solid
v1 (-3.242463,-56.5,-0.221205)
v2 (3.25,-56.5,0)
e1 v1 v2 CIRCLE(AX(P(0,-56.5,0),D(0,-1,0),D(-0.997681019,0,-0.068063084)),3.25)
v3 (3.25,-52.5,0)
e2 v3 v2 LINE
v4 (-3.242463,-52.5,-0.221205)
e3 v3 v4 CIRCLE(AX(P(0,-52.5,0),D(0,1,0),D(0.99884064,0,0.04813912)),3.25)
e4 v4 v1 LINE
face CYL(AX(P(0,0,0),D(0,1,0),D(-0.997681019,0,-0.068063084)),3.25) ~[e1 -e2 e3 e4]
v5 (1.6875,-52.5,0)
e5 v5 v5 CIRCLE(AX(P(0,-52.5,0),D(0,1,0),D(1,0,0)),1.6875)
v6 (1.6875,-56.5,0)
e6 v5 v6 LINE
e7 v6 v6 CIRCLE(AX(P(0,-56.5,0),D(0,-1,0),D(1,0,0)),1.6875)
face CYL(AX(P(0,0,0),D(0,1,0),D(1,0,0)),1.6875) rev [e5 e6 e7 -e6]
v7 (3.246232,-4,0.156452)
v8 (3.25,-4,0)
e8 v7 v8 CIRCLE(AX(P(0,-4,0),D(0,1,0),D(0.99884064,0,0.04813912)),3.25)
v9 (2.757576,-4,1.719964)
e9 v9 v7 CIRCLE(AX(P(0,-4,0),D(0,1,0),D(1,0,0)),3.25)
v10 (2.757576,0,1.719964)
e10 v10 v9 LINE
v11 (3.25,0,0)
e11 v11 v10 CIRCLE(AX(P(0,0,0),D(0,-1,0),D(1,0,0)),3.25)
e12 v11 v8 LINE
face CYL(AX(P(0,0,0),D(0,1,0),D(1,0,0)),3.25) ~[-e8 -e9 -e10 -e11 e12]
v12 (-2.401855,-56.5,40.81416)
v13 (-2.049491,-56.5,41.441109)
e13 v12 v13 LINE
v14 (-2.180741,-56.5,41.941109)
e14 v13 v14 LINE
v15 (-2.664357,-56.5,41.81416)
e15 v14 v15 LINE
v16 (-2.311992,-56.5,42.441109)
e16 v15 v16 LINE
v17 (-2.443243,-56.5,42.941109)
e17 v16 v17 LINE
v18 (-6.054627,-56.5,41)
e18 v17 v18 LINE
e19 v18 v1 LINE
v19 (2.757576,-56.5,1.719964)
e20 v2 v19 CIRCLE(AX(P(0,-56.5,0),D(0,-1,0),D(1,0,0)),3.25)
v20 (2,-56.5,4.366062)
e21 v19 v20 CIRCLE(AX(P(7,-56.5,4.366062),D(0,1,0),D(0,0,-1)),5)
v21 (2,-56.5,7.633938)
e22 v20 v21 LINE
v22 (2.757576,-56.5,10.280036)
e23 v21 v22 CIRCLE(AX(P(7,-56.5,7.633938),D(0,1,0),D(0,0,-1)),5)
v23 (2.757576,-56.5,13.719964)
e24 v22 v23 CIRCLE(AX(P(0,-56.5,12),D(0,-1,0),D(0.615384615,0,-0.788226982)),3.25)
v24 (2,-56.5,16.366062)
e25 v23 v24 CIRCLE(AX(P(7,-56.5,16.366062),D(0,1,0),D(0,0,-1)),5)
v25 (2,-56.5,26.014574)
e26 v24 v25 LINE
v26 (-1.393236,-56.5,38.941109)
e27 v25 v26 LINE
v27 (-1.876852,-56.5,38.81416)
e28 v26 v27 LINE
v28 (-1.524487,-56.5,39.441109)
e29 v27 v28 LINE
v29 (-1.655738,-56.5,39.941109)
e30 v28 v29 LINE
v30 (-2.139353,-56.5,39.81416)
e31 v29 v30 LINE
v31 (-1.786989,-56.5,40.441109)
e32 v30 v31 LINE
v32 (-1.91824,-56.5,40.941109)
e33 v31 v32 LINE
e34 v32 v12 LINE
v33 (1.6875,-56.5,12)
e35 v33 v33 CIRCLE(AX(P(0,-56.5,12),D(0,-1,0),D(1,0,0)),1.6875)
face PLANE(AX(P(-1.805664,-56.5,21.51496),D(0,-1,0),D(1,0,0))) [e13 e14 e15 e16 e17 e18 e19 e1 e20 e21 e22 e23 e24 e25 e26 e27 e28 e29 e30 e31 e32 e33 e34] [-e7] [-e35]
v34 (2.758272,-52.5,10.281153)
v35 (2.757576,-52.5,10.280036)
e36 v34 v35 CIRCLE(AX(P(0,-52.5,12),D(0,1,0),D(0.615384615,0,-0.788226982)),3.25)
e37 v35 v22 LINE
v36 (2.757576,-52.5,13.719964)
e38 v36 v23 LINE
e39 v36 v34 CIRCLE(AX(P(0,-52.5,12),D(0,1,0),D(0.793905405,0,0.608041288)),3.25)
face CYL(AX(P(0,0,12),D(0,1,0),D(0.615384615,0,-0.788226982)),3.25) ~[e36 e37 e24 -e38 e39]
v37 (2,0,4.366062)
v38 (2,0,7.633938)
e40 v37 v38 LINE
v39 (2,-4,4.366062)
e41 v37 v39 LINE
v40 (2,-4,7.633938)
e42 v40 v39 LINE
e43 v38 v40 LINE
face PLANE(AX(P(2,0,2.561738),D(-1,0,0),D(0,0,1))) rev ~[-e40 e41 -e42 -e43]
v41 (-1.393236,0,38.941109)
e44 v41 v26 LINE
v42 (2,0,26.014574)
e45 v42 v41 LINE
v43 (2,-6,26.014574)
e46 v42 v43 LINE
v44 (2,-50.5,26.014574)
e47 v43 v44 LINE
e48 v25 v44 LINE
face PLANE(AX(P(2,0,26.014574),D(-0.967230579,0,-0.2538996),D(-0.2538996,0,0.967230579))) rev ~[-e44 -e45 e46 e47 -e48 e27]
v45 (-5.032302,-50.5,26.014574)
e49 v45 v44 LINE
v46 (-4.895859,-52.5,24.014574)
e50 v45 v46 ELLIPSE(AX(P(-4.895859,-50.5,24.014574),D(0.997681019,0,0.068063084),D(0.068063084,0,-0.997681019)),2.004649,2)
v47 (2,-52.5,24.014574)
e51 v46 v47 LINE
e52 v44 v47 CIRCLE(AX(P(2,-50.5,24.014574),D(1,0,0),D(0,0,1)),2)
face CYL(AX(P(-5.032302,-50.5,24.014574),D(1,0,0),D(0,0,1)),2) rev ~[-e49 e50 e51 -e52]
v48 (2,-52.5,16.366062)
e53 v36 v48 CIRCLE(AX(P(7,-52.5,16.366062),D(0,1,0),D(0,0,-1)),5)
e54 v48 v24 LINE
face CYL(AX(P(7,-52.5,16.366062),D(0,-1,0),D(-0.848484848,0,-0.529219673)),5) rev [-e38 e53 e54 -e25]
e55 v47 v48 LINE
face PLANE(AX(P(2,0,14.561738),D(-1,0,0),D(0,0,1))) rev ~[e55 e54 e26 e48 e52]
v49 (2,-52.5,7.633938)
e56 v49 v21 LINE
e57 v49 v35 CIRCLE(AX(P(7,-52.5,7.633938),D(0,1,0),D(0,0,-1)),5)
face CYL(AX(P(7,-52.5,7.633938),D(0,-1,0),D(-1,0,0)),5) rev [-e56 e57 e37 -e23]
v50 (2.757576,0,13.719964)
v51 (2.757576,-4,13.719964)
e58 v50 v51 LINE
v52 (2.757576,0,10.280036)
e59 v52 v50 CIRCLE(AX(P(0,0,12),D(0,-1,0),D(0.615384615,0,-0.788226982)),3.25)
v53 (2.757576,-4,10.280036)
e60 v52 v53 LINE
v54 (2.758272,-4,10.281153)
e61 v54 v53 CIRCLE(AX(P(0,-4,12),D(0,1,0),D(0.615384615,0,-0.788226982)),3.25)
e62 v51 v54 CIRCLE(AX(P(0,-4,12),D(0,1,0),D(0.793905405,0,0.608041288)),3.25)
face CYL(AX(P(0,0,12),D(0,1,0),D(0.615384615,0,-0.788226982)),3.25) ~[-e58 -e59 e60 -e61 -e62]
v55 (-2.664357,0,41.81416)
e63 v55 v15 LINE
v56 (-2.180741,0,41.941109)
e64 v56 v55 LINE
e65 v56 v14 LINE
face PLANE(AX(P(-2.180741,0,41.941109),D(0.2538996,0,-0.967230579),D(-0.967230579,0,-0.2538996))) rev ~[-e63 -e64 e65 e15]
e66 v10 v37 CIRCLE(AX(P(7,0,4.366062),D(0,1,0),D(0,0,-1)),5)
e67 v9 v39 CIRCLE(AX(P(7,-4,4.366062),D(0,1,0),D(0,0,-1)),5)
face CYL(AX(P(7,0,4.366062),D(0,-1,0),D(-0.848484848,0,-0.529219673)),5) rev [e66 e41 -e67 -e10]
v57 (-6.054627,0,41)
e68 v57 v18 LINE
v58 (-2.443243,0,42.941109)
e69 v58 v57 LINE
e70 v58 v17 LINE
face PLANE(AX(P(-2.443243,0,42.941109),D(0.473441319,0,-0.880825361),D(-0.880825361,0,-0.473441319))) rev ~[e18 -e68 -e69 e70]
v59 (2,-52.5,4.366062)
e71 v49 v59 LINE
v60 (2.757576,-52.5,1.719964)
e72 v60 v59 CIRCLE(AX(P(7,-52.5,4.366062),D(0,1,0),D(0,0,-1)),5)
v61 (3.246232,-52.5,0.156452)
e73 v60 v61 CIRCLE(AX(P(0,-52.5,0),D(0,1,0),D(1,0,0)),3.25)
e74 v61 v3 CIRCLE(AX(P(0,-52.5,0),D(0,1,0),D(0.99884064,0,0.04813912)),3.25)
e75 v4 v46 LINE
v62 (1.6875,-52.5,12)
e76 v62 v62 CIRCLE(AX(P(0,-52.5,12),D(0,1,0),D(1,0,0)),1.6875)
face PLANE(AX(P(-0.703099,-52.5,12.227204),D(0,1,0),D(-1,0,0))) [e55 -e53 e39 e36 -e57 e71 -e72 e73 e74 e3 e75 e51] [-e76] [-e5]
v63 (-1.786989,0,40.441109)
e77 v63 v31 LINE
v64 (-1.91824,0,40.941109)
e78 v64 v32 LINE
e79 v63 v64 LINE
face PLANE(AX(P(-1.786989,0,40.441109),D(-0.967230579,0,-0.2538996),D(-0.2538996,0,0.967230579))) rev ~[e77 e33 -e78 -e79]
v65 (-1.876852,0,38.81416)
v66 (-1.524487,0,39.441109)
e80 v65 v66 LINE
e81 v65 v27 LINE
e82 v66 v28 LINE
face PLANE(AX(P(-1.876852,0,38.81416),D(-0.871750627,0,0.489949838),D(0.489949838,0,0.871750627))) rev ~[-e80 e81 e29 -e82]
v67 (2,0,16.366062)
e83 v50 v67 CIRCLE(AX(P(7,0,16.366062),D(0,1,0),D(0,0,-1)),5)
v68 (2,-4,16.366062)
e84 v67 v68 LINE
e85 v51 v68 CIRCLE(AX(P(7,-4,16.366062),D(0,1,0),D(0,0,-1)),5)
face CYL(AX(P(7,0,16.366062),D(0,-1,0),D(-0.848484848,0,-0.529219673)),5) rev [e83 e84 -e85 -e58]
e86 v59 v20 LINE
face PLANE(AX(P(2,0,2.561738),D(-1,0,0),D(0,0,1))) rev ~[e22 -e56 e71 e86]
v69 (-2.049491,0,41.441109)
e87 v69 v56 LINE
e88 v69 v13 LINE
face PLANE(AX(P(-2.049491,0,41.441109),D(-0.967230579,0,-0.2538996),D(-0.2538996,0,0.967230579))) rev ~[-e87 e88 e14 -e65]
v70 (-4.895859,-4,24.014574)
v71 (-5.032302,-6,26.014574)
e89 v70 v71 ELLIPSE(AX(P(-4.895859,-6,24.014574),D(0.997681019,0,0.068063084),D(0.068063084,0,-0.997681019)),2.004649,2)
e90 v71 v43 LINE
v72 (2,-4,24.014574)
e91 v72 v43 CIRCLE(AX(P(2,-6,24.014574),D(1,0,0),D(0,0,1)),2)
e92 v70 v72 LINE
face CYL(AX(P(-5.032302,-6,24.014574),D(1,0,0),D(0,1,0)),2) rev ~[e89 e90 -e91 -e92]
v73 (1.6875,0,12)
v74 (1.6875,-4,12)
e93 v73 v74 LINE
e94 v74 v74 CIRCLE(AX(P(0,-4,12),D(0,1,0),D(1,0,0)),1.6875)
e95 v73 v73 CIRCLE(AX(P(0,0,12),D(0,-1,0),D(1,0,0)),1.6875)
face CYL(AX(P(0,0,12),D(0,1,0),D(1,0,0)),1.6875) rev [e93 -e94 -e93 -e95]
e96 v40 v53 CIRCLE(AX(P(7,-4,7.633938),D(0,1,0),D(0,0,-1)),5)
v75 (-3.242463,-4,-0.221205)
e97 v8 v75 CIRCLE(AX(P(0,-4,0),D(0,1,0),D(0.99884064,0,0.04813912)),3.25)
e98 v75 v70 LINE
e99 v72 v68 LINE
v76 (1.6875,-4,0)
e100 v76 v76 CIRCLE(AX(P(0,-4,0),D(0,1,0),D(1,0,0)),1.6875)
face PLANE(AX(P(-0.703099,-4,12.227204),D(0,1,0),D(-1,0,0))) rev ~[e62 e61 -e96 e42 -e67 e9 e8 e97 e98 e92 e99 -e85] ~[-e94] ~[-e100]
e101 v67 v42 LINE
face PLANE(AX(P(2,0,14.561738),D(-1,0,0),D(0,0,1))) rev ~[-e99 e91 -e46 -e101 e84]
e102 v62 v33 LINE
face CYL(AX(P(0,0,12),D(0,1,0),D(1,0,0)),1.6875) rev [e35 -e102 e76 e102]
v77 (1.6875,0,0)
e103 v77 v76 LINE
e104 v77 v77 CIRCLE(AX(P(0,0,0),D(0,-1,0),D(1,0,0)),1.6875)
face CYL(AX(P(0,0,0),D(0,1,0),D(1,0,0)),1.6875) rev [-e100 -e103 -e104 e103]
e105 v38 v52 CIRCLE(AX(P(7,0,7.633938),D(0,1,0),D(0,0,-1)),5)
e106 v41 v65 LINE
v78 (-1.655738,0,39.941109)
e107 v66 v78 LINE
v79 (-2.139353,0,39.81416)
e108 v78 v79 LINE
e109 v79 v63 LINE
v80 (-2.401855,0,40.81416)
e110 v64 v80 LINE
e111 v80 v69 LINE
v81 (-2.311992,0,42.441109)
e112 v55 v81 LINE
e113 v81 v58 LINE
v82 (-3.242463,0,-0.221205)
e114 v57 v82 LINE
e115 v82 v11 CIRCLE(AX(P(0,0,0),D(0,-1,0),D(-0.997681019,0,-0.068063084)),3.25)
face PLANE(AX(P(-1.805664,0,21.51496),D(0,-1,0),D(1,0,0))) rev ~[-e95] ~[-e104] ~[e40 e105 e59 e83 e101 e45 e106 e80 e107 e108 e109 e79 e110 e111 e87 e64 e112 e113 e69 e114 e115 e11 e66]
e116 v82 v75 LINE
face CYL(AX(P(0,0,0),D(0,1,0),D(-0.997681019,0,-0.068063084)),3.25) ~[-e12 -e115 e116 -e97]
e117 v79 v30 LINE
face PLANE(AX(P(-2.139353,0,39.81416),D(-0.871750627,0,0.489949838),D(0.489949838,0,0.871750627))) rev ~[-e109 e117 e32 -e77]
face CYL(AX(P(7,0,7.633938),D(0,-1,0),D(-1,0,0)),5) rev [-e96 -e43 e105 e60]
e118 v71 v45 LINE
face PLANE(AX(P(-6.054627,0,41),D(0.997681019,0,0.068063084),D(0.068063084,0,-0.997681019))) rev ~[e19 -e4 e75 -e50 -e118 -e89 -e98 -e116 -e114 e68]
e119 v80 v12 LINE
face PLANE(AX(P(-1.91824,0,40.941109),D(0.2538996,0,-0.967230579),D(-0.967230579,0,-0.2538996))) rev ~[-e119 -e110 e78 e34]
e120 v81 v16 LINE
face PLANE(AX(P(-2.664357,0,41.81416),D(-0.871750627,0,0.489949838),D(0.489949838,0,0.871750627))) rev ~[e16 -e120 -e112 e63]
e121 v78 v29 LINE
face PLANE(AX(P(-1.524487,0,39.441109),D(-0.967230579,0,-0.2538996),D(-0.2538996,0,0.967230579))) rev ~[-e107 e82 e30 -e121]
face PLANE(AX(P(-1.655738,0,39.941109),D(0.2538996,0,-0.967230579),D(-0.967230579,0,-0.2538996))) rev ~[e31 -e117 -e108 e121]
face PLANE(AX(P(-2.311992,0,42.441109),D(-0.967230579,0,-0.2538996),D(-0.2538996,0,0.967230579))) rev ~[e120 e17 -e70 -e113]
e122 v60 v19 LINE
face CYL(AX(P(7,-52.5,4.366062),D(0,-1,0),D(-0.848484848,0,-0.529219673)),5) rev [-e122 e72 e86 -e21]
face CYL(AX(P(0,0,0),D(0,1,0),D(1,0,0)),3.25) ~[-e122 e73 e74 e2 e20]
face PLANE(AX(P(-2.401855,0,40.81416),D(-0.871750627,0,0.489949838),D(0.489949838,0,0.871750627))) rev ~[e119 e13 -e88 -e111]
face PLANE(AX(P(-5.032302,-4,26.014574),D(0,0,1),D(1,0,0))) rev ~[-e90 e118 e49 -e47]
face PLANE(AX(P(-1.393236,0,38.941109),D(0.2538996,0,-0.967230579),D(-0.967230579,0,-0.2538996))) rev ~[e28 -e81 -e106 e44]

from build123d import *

# Parameters (mm, degrees)
F0_R     = 1.6875
F0_R_2   = 2
F1_DEPTH = 56.5
F3_START = -4
F3_DEPTH = 48.5
F5_R     = 5
F6_R     = 2


# Not quite as in the source:
# - a feature of the source that left no trace in its solid (it failed there, or was rolled back) is left out
# - a feature names something its author has since deleted; it is built from what else it names


with BuildPart() as f1:
    # F0 (on Front) → F1 (new body)
    with BuildSketch(Plane.XZ):
        with BuildLine():
            ThreePointArc((-3.2424633134, -0.2212050215), (-1.5238508153, 2.8706059801), (2, 2.5617376915))
            Line((2, 2.5617376915), (2, 9.4382623085))
            ThreePointArc((2, 9.4382623085), (3.25, 12), (2, 14.5617376915))
            Line((2, 14.5617376915), (2, 16))
            Line((2, 16), (2, 26.0145742767))
            Line((2, 26.0145742767), (-1.3932364987, 38.9411094094))
            Line((-1.3932364987, 38.9411094094), (-1.8768517883, 38.8141596092))
            Line((-1.8768517883, 38.8141596092), (-1.5244873121, 39.4411094094))
            Line((-1.5244873121, 39.4411094094), (-1.6557381254, 39.9411094094))
            Line((-1.6557381254, 39.9411094094), (-2.1393534149, 39.8141596092))
            Line((-2.1393534149, 39.8141596092), (-1.7869889387, 40.4411094094))
            Line((-1.7869889387, 40.4411094094), (-1.918239752, 40.9411094094))
            Line((-1.918239752, 40.9411094094), (-2.4018550415, 40.8141596092))
            Line((-2.4018550415, 40.8141596092), (-2.0494905653, 41.4411094094))
            Line((-2.0494905653, 41.4411094094), (-2.1807413786, 41.9411094094))
            Line((-2.1807413786, 41.9411094094), (-2.6643566681, 41.8141596092))
            Line((-2.6643566681, 41.8141596092), (-2.3119921919, 42.4411094094))
            Line((-2.3119921919, 42.4411094094), (-2.4432430052, 42.9411094094))
            Line((-2.4432430052, 42.9411094094), (-6.0546269865, 41))
            Line((-6.0546269865, 41), (-3.2424633134, -0.2212050215))
        make_face()
        with Locations((0, 12)):
            Circle(F0_R, mode=Mode.SUBTRACT)
        with BuildLine():
            ThreePointArc((3.25, 0), (2.9208303614, 1.4252192814), (2, 2.5617376915))
            ThreePointArc((2, 2.5617376915), (-1.5238508153, 2.8706059801), (-3.2424633134, -0.2212050215))
            ThreePointArc((-3.2424633134, -0.2212050215), (0.1106666878, -3.2481152819), (3.25, 0))
        make_face()
        Circle(F0_R_2, mode=Mode.SUBTRACT)
        Circle(F0_R_2)
        Circle(F0_R, mode=Mode.SUBTRACT)
    extrude(amount=F1_DEPTH)

    # F2 (on face) → F3 (cut)
    with BuildSketch(Plane(origin=(0, 0, 0), x_dir=(-1, 0, 0), z_dir=(0, 1, 0)).offset(F3_START)):
        with BuildLine():
            Line((5.032301952, 26.0145742767), (-2, 26.0145742767))
            Line((-2, 26.0145742767), (-2.5801925668, 13.9761341853))
            ThreePointArc((-2.5801925668, 13.9761341853), (-3.2462320816, 12.1564521408), (-2.7582721639, 10.2811530987))
            Line((-2.7582721639, 10.2811530987), (-3.2462320816, 0.1564521408))
            ThreePointArc((-3.2462320816, 0.1564521408), (-0.1888379833, -3.2445092412), (3.2424633134, -0.2212050215))
            Line((3.2424633134, -0.2212050215), (5.032301952, 26.0145742767))
        make_face()
    extrude(amount=-F3_DEPTH, mode=Mode.SUBTRACT)

    # F5
    f5_edges = [f1.edges().sort_by_distance(p)[0] for p in [
        (2, -2, 9.438262),
        (2, -54.5, 9.438262),
        (2, -2, 2.561738),
        (2, -2, 14.561738),
        (2, -54.5, 14.561738),
        (2, -54.5, 2.561738),
    ]]
    fillet(f5_edges, radius=F5_R)

    # F6
    f6_edges = [f1.edges().sort_by_distance(p)[0] for p in [
        (-1.516151, -52.5, 26.014574),
        (-1.516151, -4, 26.014574),
    ]]
    fillet(f6_edges, radius=F6_R)


solid = f1.part
